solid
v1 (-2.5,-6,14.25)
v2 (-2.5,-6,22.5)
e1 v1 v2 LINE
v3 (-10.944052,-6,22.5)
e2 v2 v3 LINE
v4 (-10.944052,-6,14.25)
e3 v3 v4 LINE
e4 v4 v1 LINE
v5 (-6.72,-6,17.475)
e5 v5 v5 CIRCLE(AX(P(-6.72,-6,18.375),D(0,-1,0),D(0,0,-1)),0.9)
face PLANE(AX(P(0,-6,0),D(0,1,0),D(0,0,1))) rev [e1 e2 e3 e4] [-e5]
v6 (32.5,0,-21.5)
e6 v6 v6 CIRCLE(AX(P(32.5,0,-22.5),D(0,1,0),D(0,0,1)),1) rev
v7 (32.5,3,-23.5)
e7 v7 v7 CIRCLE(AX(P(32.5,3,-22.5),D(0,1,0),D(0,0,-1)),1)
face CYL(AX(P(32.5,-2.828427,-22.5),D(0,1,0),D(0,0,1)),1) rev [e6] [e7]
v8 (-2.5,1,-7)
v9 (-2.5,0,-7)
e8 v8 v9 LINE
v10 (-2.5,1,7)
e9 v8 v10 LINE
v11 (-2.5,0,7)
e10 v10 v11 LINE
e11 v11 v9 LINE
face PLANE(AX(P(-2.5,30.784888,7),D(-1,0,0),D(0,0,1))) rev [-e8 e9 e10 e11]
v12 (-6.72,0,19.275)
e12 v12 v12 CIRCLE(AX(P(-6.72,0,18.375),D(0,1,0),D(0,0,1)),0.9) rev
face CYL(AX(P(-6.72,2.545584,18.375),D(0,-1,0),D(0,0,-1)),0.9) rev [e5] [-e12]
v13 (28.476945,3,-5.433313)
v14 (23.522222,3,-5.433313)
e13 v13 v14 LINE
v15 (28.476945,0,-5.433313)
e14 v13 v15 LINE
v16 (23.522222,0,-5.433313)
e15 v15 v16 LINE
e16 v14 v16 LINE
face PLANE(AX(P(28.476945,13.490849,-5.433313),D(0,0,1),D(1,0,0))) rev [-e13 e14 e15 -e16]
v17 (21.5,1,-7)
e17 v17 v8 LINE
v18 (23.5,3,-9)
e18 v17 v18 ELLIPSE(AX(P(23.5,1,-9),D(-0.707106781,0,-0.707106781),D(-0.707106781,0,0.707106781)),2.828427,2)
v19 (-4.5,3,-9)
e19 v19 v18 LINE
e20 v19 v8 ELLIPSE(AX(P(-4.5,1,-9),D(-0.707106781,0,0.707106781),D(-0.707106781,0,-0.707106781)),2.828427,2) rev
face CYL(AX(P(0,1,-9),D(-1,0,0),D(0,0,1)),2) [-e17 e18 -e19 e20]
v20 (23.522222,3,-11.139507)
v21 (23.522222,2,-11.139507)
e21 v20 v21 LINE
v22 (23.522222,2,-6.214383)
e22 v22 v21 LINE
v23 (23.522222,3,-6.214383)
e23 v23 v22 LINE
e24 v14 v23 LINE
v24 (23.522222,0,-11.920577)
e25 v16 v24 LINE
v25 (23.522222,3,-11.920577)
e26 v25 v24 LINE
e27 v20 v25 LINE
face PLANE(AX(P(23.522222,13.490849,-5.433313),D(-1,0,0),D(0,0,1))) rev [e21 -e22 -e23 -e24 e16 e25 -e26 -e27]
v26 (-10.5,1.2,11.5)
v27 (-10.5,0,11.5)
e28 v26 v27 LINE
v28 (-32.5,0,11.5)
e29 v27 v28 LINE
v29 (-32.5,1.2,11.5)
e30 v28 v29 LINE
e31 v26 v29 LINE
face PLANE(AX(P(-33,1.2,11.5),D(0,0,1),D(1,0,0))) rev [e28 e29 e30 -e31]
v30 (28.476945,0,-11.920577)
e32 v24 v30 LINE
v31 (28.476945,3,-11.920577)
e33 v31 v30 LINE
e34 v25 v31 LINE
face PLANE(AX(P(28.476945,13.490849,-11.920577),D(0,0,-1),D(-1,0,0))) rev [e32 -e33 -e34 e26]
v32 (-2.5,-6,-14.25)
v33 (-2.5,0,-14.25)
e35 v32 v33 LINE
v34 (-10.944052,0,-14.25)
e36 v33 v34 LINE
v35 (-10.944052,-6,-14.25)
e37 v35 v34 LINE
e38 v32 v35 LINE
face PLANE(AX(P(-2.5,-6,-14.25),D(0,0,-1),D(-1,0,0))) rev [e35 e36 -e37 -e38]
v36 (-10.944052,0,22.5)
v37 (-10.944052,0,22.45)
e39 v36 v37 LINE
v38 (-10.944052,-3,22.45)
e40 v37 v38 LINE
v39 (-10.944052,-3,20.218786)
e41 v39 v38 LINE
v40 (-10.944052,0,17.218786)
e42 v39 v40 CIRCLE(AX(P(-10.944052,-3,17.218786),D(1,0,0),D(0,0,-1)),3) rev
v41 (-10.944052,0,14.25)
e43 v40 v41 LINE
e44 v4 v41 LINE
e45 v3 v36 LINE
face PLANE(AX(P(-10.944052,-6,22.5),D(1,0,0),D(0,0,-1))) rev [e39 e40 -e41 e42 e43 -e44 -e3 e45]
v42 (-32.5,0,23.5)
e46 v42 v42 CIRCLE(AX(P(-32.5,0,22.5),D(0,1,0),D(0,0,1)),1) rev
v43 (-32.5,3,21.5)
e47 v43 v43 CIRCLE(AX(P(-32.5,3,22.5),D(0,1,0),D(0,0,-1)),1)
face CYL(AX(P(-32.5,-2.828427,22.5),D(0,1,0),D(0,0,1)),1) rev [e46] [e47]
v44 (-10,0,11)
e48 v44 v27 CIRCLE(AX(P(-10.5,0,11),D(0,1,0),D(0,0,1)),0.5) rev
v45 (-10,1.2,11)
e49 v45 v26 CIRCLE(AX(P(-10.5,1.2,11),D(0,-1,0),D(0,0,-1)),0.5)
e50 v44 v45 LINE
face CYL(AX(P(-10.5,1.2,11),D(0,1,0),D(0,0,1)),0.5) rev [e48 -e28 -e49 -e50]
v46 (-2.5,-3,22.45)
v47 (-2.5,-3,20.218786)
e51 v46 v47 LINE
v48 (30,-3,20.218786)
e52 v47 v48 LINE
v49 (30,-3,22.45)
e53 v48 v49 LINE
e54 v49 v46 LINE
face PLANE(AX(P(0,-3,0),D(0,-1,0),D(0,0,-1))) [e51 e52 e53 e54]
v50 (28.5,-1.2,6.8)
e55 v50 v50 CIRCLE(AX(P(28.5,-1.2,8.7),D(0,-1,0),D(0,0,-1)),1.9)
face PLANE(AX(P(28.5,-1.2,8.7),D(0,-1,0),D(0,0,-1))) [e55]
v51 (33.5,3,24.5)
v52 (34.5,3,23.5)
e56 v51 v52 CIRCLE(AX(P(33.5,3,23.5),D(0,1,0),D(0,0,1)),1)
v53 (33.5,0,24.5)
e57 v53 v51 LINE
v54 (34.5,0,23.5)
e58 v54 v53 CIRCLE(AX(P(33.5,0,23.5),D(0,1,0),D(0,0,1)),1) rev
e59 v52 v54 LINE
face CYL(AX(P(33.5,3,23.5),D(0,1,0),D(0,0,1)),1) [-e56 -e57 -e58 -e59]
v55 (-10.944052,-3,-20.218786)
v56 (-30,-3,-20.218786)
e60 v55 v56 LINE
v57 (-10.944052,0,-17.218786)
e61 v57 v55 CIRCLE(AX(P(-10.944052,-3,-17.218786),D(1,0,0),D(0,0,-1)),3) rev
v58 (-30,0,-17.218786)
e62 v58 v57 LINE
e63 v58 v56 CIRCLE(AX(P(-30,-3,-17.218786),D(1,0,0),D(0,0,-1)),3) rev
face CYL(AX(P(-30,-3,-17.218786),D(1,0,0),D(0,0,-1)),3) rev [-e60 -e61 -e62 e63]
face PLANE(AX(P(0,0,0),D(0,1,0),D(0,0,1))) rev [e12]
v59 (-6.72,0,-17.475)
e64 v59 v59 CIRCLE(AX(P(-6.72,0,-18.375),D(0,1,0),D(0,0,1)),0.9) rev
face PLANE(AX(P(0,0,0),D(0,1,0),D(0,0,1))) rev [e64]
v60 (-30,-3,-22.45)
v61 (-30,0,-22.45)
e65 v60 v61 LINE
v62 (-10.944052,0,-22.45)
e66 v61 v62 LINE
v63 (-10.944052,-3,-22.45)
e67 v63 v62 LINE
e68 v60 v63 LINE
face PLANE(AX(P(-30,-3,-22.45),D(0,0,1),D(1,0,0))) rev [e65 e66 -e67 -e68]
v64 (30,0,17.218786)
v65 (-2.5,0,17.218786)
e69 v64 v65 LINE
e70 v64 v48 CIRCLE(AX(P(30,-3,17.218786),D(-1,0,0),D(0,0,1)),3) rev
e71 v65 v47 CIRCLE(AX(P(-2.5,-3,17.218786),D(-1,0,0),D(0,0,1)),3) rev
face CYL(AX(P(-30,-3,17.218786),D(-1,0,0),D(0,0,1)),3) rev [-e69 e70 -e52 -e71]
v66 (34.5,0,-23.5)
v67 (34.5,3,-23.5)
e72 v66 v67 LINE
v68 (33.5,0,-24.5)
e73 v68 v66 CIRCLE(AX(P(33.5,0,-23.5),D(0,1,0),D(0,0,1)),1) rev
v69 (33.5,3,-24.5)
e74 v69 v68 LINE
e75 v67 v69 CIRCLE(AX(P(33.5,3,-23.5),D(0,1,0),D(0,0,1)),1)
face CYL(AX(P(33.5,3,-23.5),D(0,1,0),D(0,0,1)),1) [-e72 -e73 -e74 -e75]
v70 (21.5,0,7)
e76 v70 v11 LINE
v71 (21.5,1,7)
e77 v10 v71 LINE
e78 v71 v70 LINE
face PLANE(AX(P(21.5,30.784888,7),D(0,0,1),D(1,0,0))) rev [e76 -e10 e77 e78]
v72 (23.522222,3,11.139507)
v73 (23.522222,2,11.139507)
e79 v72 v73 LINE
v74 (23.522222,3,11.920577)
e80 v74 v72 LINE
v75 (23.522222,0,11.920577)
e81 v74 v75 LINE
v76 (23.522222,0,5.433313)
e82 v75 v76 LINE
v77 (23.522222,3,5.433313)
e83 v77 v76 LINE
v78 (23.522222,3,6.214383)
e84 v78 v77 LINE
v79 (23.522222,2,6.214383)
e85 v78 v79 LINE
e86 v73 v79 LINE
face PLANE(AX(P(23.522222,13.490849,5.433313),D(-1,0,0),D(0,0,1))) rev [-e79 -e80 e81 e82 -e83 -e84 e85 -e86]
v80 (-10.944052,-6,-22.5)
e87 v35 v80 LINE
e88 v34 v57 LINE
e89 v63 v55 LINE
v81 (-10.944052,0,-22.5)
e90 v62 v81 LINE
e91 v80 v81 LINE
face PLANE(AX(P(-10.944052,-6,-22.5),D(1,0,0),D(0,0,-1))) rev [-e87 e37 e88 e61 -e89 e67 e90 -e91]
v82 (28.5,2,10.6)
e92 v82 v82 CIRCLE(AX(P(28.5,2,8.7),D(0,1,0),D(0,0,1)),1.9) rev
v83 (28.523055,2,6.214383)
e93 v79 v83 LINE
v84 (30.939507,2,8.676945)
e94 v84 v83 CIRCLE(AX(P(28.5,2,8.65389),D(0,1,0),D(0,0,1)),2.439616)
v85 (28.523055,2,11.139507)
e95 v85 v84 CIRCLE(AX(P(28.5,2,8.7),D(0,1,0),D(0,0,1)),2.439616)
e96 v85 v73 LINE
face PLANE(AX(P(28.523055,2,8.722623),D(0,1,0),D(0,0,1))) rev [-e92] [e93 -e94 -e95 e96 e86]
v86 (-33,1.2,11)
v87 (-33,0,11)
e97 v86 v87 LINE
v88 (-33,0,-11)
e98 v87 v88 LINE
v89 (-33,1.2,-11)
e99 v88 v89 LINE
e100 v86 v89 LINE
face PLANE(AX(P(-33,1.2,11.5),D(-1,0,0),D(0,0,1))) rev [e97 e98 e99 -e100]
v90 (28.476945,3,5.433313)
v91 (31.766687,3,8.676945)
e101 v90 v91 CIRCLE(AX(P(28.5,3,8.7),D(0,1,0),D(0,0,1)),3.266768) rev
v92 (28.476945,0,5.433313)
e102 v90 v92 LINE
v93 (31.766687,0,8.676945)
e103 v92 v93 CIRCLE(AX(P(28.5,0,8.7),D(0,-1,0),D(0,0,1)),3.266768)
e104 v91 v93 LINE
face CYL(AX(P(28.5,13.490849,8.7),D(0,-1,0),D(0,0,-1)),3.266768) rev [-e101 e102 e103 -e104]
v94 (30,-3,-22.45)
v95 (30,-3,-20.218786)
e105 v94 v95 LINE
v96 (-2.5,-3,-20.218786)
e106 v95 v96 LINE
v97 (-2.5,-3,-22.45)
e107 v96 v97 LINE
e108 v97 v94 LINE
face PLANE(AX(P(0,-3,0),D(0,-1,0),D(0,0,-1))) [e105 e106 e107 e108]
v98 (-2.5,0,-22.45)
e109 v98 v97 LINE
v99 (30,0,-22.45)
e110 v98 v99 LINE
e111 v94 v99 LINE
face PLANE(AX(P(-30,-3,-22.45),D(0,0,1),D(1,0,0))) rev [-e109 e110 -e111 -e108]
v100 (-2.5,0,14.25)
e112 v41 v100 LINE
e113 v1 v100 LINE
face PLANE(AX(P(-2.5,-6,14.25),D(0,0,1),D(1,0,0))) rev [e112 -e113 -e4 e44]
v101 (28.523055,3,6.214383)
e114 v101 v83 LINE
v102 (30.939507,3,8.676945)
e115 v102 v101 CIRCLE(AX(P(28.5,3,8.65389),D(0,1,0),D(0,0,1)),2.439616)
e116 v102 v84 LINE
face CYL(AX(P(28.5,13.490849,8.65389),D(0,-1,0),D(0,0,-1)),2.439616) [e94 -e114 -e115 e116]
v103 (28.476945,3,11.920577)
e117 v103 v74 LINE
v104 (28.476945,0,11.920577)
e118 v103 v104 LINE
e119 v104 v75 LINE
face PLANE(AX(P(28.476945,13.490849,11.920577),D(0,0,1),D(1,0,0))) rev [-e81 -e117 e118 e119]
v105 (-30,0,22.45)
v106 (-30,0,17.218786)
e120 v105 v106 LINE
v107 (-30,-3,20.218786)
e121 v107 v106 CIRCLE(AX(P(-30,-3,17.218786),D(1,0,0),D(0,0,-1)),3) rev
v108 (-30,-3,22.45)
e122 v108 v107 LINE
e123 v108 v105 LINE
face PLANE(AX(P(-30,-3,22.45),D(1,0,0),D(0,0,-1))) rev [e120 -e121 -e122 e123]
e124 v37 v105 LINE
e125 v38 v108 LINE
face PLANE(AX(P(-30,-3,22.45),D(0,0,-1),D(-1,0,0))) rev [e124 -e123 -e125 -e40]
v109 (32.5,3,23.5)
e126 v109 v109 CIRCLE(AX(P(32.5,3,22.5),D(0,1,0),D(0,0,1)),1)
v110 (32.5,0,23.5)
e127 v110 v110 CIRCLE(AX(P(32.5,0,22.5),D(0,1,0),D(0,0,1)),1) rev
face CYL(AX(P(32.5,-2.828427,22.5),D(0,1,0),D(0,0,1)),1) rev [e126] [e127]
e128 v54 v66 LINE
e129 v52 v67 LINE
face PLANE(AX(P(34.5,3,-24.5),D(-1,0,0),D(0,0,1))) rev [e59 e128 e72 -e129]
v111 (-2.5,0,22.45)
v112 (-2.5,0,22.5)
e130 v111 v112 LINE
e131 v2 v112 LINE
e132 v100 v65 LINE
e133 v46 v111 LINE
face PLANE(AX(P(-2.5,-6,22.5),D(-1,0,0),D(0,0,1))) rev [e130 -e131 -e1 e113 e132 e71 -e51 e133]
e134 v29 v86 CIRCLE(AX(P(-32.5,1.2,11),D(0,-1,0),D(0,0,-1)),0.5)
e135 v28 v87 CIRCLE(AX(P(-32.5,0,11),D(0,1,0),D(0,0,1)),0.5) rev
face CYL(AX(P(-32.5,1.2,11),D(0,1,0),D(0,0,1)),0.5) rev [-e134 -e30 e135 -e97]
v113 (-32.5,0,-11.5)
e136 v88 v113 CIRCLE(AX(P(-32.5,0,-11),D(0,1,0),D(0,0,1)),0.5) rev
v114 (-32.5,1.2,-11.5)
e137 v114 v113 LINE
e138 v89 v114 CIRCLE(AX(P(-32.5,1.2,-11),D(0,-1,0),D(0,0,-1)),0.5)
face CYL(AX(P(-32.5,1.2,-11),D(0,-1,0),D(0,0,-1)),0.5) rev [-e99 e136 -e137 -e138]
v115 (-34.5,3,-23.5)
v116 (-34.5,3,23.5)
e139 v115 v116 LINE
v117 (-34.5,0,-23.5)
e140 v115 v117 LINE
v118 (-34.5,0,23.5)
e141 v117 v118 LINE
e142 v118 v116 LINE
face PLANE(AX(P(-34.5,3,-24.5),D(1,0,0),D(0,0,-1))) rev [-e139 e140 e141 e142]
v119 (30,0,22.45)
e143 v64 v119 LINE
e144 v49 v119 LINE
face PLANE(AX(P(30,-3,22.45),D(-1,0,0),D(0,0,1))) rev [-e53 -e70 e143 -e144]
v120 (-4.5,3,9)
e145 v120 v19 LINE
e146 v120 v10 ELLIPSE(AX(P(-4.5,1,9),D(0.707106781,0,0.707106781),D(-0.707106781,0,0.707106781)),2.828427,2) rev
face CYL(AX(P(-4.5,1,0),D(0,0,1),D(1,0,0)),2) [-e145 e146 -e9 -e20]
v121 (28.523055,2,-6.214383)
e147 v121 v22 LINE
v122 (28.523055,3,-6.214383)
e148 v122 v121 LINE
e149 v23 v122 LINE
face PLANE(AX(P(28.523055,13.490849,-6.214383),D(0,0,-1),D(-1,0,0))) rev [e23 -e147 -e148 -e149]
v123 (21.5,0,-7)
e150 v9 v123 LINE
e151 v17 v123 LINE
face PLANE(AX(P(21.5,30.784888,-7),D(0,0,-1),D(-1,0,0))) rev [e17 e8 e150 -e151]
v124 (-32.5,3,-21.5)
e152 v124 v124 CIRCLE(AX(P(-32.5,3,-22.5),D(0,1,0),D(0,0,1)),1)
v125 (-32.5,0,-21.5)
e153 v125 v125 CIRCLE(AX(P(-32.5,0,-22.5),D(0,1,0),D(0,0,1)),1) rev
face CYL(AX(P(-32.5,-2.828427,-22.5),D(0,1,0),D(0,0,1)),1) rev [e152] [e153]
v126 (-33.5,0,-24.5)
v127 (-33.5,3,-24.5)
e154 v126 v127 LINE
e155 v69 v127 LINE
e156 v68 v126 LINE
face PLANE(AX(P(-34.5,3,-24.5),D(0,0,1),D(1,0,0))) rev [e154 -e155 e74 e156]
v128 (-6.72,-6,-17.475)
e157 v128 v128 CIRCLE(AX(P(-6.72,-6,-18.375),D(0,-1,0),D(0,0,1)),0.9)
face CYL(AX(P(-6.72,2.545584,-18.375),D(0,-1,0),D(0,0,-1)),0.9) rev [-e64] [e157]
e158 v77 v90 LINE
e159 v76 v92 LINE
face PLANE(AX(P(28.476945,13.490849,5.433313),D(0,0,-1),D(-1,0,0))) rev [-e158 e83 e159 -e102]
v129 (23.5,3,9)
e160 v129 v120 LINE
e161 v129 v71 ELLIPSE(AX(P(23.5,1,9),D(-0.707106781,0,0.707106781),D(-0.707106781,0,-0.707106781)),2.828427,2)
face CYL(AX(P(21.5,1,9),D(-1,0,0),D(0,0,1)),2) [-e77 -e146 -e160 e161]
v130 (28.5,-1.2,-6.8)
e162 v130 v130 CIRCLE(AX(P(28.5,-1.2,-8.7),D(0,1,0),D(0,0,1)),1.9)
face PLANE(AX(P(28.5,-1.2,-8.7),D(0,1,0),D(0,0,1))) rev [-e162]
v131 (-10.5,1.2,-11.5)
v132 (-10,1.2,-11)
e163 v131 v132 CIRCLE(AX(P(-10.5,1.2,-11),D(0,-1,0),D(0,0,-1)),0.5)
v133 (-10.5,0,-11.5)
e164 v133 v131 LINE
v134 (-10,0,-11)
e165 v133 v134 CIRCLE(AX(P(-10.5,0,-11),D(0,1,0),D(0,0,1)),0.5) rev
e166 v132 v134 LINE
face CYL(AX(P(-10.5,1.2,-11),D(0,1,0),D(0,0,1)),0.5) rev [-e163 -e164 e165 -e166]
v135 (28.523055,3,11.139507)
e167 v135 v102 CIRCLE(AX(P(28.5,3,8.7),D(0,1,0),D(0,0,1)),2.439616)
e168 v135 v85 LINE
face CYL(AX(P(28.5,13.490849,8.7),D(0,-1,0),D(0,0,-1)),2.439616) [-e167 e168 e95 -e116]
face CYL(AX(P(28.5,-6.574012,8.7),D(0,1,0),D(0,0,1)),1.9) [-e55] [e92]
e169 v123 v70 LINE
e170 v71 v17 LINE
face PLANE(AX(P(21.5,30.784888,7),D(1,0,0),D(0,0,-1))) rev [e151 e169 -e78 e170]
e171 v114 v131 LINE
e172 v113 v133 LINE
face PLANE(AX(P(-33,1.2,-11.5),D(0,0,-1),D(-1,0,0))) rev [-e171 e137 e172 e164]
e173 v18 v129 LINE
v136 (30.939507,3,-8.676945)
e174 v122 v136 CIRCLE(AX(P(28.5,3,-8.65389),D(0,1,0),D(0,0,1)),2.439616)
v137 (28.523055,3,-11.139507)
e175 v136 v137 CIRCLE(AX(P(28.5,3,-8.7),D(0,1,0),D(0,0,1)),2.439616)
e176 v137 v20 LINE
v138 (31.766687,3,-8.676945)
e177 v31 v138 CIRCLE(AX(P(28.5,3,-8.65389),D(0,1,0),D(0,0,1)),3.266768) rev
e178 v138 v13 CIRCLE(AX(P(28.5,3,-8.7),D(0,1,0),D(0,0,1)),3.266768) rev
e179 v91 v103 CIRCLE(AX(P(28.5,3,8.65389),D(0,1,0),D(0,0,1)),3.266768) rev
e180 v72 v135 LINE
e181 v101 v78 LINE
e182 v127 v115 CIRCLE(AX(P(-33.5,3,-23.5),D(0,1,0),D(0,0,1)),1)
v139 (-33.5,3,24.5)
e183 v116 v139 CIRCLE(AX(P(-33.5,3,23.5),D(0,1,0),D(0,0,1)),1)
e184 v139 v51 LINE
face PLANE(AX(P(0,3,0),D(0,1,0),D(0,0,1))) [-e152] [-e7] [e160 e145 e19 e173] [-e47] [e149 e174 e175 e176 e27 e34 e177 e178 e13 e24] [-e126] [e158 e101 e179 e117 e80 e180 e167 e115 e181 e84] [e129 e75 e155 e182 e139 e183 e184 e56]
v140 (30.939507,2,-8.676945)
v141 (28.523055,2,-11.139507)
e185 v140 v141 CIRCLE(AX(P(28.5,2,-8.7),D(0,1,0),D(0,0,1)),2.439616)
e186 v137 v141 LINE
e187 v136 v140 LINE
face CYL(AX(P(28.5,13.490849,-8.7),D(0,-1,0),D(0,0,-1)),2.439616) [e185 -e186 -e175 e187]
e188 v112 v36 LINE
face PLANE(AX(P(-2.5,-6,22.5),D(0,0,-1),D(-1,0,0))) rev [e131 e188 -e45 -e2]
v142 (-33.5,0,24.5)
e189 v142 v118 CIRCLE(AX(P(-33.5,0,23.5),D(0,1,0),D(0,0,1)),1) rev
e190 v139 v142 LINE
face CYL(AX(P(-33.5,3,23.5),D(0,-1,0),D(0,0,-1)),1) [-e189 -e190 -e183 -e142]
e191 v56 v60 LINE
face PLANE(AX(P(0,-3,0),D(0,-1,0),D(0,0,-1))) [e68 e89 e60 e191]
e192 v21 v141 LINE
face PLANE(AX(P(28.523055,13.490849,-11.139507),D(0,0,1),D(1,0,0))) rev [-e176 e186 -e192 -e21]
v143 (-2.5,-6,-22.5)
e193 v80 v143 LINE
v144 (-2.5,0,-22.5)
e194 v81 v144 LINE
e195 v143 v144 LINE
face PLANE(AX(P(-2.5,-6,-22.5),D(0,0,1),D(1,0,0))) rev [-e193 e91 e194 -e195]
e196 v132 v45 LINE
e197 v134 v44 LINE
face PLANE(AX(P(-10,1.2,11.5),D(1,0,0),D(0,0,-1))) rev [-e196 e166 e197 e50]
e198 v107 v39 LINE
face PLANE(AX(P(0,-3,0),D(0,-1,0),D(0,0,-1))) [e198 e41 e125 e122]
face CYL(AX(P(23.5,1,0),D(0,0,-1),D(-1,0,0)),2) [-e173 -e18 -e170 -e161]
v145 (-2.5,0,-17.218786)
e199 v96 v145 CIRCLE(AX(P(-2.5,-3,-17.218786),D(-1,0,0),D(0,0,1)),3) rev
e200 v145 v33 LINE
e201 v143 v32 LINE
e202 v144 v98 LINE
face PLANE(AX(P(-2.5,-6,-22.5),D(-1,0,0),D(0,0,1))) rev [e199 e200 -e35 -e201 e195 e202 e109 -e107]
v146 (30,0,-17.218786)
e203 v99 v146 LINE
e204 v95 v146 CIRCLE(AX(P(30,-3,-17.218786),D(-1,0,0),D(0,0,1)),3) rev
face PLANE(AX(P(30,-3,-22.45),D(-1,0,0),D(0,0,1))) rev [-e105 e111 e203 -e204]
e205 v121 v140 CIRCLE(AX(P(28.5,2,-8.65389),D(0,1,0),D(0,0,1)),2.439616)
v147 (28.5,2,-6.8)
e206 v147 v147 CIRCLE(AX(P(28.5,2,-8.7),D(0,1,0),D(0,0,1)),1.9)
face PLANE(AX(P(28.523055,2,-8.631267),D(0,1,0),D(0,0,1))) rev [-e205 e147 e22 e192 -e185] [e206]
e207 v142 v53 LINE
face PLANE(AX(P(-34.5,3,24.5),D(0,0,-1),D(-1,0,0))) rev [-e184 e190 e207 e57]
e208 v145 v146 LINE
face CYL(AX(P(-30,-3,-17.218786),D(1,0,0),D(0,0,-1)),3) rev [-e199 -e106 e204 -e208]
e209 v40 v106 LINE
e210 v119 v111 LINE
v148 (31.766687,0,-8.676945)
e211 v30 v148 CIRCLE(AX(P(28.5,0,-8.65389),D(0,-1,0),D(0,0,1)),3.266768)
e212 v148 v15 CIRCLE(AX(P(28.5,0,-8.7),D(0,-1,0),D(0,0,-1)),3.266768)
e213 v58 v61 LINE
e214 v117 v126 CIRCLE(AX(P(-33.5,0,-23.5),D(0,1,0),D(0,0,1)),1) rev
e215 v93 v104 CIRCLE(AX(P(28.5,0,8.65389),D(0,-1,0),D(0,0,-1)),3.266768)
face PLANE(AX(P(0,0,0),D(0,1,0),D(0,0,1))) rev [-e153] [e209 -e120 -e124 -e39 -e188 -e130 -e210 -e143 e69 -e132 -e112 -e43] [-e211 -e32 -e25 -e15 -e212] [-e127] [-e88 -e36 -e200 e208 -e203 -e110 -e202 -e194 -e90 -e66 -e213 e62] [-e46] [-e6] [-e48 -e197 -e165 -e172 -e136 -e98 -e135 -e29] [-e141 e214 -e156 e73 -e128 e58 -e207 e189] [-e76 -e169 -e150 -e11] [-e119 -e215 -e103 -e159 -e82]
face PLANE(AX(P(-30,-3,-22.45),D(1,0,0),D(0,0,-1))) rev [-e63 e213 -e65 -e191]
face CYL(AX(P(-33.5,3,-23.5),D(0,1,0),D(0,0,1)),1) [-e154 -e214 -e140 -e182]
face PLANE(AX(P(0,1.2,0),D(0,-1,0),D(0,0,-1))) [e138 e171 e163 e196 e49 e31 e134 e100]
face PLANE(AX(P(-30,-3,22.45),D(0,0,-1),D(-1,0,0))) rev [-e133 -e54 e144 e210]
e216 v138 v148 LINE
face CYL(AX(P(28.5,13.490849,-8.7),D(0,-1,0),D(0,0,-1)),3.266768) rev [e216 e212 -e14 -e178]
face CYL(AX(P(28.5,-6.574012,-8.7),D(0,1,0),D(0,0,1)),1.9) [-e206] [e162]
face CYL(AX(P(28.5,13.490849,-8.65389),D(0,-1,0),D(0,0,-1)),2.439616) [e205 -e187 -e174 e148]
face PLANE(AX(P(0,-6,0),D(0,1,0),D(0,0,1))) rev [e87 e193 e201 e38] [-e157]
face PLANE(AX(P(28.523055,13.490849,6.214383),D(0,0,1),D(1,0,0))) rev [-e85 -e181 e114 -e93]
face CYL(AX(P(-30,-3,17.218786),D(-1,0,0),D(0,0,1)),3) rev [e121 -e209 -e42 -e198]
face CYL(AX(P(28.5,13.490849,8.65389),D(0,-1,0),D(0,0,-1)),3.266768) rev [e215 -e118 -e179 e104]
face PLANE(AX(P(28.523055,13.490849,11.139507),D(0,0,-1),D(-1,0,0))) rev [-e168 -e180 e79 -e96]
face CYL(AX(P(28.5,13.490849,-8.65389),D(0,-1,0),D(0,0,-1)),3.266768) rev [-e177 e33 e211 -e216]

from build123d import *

# Parameters (mm, degrees)
SCHIZZO1_W                        = 69
SCHIZZO1_H                        = 49
ESTRUSIONE_ESTRUSIONE1_DEPTH      = 3
RACCORDO1_R                       = 1
RACCORDO2_R                       = 1
RACCORDO3_R                       = 1
RACCORDO4_R                       = 1
SCHIZZO2_W                        = 60
SCHIZZO2_H                        = 2.231214474
ESTRUSIONE_ESTRUSIONE2_DEPTH      = 3
RACCORDO5_R                       = 3
RACCORDO6_R                       = 3
SCHIZZO3_R                        = 1
TAGLIO_ESTRUSIONE1_DEPTH          = 3
SCHIZZO4_W                        = 24
SCHIZZO4_H                        = 14
TAGLIO_ESTRUSIONE2_DEPTH          = 3
SCHIZZO5_W                        = 23
SCHIZZO5_H                        = 23
TAGLIO_ESTRUSIONE3_DEPTH          = 1.2
RACCORDO7_R                       = 0.5
RACCORDO8_R                       = 0.5
RACCORDO9_R                       = 0.5
RACCORDO10_R                      = 0.5
RACCORDO11_R                      = 2
RACCORDO12_R                      = 2
RACCORDO13_R                      = 2
RACCORDO14_R                      = 2
SCHIZZO6_W                        = 8.444052449
SCHIZZO6_H                        = 8.25
ESTRUSIONE_ESTRUSIONE3_DEPTH      = 6
SCHIZZO7_R                        = 0.9
TAGLIO_ESTRUSIONE4_DEPTH          = 6
ESTRUSIONE_ESTRUSIONE4_DEPTH      = 1.2
ESTRUSIONE_ESTRUSIONE4_DEPTH_BACK = 3
SCHIZZO8_R                        = 1.75
TAGLIO_ESTRUSIONE5_DEPTH          = 3
TAGLIO_ESTRUSIONE6_DEPTH          = 2
SCHIZZO13_R                       = 1.9
ESTRUSIONE_ESTRUSIONE5_DEPTH      = 3.2
SCHIZZO14_R                       = 1.9
ESTRUSIONE_ESTRUSIONE6_DEPTH      = 3.2


with BuildPart() as part:
    # Schizzo1 → Estrusione-Estrusione1 (new body)
    with BuildSketch(Plane(origin=(0, 0, 0), x_dir=(1, 0, 0), z_dir=(0, 1, 0))):
        Rectangle(SCHIZZO1_W, SCHIZZO1_H)
    extrude(amount=ESTRUSIONE_ESTRUSIONE1_DEPTH)

    # Raccordo1
    raccordo1_edges = [part.edges().sort_by_distance(p)[0] for p in [
        (-34.5, 1.5, 24.5),
    ]]
    fillet(raccordo1_edges, radius=RACCORDO1_R)

    # Raccordo2
    raccordo2_edges = [part.edges().sort_by_distance(p)[0] for p in [
        (-34.5, 1.5, -24.5),
    ]]
    fillet(raccordo2_edges, radius=RACCORDO2_R)

    # Raccordo3
    raccordo3_edges = [part.edges().sort_by_distance(p)[0] for p in [
        (34.5, 1.5, 24.5),
    ]]
    fillet(raccordo3_edges, radius=RACCORDO3_R)

    # Raccordo4
    raccordo4_edges = [part.edges().sort_by_distance(p)[0] for p in [
        (34.5, 1.5, -24.5),
    ]]
    fillet(raccordo4_edges, radius=RACCORDO4_R)

    # Schizzo2 → Estrusione-Estrusione2 (add)
    with BuildSketch(Plane.XZ):
        with Locations((0, 21.334392763)):
            Rectangle(SCHIZZO2_W, SCHIZZO2_H)
        with Locations((0, -21.334392763)):
            Rectangle(SCHIZZO2_W, SCHIZZO2_H)
    extrude(amount=ESTRUSIONE_ESTRUSIONE2_DEPTH)

    # Raccordo5
    raccordo5_edges = [part.edges().sort_by_distance(p)[0] for p in [
        (0, 0, 20.218785526),
    ]]
    fillet(raccordo5_edges, radius=RACCORDO5_R - 0.0001)  # a hair under: the kernel refuses the full size

    # Raccordo6
    raccordo6_edges = [part.edges().sort_by_distance(p)[0] for p in [
        (0, 0, -20.218785526),
    ]]
    fillet(raccordo6_edges, radius=RACCORDO6_R - 0.0001)  # a hair under: the kernel refuses the full size

    # Schizzo3 → Taglio-Estrusione1 (cut)
    with BuildSketch(Plane(origin=(0, 3, 0), x_dir=(1, 0, 0), z_dir=(0, 1, 0))):
        with Locations(Location((-32.5, 22.5, 0), (0, 0, 270))):
            Circle(SCHIZZO3_R)
        with Locations(Location((32.5, 22.5, 0), (0, 0, 270))):
            Circle(SCHIZZO3_R)
        with Locations(Location((32.5, -22.5, 0), (0, 0, 270))):
            Circle(SCHIZZO3_R)
        with Locations(Location((-32.5, -22.5, 0), (0, 0, 270))):
            Circle(SCHIZZO3_R)
    extrude(amount=-TAGLIO_ESTRUSIONE1_DEPTH, mode=Mode.SUBTRACT)

    # Schizzo4 → Taglio-Estrusione2 (cut)
    with BuildSketch(Plane.XZ):
        with Locations((9.5, 0)):
            Rectangle(SCHIZZO4_W, SCHIZZO4_H)
    extrude(amount=-TAGLIO_ESTRUSIONE2_DEPTH, mode=Mode.SUBTRACT)

    # Schizzo5 → Taglio-Estrusione3 (cut)
    with BuildSketch(Plane.XZ):
        with Locations((-21.5, 0)):
            Rectangle(SCHIZZO5_W, SCHIZZO5_H)
    extrude(amount=-TAGLIO_ESTRUSIONE3_DEPTH, mode=Mode.SUBTRACT)

    # Raccordo7
    raccordo7_edges = [part.edges().sort_by_distance(p)[0] for p in [
        (-33, 0.6, 11.5),
    ]]
    fillet(raccordo7_edges, radius=RACCORDO7_R)

    # Raccordo8
    raccordo8_edges = [part.edges().sort_by_distance(p)[0] for p in [
        (-10, 0.6, 11.5),
    ]]
    fillet(raccordo8_edges, radius=RACCORDO8_R)

    # Raccordo9
    raccordo9_edges = [part.edges().sort_by_distance(p)[0] for p in [
        (-33, 0.6, -11.5),
    ]]
    fillet(raccordo9_edges, radius=RACCORDO9_R)

    # Raccordo10
    raccordo10_edges = [part.edges().sort_by_distance(p)[0] for p in [
        (-10, 0.6, -11.5),
    ]]
    fillet(raccordo10_edges, radius=RACCORDO10_R)

    # Raccordo11
    raccordo11_edges = [part.edges().sort_by_distance(p)[0] for p in [
        (21.5, 3, 0),
    ]]
    fillet(raccordo11_edges, radius=RACCORDO11_R)

    # Raccordo12
    raccordo12_edges = [part.edges().sort_by_distance(p)[0] for p in [
        (10.5, 3, 7),
    ]]
    fillet(raccordo12_edges, radius=RACCORDO12_R)

    # Raccordo13
    raccordo13_edges = [part.edges().sort_by_distance(p)[0] for p in [
        (-2.5, 3, 1),
    ]]
    fillet(raccordo13_edges, radius=RACCORDO13_R)

    # Raccordo14
    raccordo14_edges = [part.edges().sort_by_distance(p)[0] for p in [
        (9.5, 3, -7),
    ]]
    fillet(raccordo14_edges, radius=RACCORDO14_R)

    # Schizzo6 → Estrusione-Estrusione3 (add)
    with BuildSketch(Plane.XZ):
        with Locations((-6.722026225, 18.375)):
            Rectangle(SCHIZZO6_W, SCHIZZO6_H)
        with Locations((-6.722026225, -18.375)):
            Rectangle(SCHIZZO6_W, SCHIZZO6_H)
    extrude(amount=ESTRUSIONE_ESTRUSIONE3_DEPTH)

    # Schizzo7 → Taglio-Estrusione4 (cut)
    with BuildSketch(Plane.XZ.offset(6)):
        with Locations(Location((-6.72, 18.375, 0), (0, 0, 270))):
            Circle(SCHIZZO7_R)
        with Locations(Location((-6.72, -18.375, 0), (0, 0, 90))):
            Circle(SCHIZZO7_R)
    extrude(amount=-TAGLIO_ESTRUSIONE4_DEPTH, mode=Mode.SUBTRACT)

    # Schizzo8 → Estrusione-Estrusione4 (add, two sides: drawn at the far end of the back side and taken through both)
    with BuildSketch(Plane.XZ.offset(-ESTRUSIONE_ESTRUSIONE4_DEPTH_BACK)):
        with Locations(Location((28.5, 8.7, 0), (0, 0, 270))):
            Circle(SCHIZZO8_R)
        with Locations(Location((28.5, -8.7, 0), (0, 0, 90))):
            Circle(SCHIZZO8_R)
    extrude(amount=ESTRUSIONE_ESTRUSIONE4_DEPTH + ESTRUSIONE_ESTRUSIONE4_DEPTH_BACK)

    # Schizzo9 → Taglio-Estrusione5 (cut)
    with BuildSketch(Plane.XZ):
        with BuildLine():
            Line((28.523054823, 11.139507375), (23.522221501, 11.139507375))
            Line((23.522221501, 11.139507375), (23.522221501, 11.920576973))
            Line((23.522221501, 11.920576973), (28.476945177, 11.920576973))
            ThreePointArc((28.476945177, 11.920576973), (30.793594038, 10.980088836), (31.766686618, 8.676945177))
            ThreePointArc((31.766686618, 8.676945177), (30.793594038, 6.373801519), (28.476945177, 5.433313382))
            Line((28.476945177, 5.433313382), (23.522221501, 5.433313382))
            Line((23.522221501, 5.433313382), (23.522221501, 6.21438298))
            Line((23.522221501, 6.21438298), (28.523054823, 6.21438298))
            ThreePointArc((28.523054823, 6.21438298), (30.241294429, 6.945200369), (30.939507375, 8.676945177))
            ThreePointArc((30.939507375, 8.676945177), (30.241294429, 10.408689986), (28.523054823, 11.139507375))
        make_face()
        with BuildLine():
            Line((23.522221501, -5.433313382), (23.522221501, -6.21438298))
            Line((23.522221501, -6.21438298), (28.523054823, -6.21438298))
            ThreePointArc((28.523054823, -6.21438298), (30.241294429, -6.945200369), (30.939507375, -8.676945177))
            ThreePointArc((30.939507375, -8.676945177), (30.241294429, -10.408689986), (28.523054823, -11.139507375))
            Line((28.523054823, -11.139507375), (23.522221501, -11.139507375))
            Line((23.522221501, -11.139507375), (23.522221501, -11.920576973))
            Line((23.522221501, -11.920576973), (28.476945177, -11.920576973))
            ThreePointArc((28.476945177, -11.920576973), (30.793594038, -10.980088836), (31.766686618, -8.676945177))
            ThreePointArc((31.766686618, -8.676945177), (30.793594038, -6.373801519), (28.476945177, -5.433313382))
            Line((28.476945177, -5.433313382), (23.522221501, -5.433313382))
        make_face()
    extrude(amount=-TAGLIO_ESTRUSIONE5_DEPTH, mode=Mode.SUBTRACT)

    # Schizzo11 → Taglio-Estrusione6 (cut)
    with BuildSketch(Plane.XZ):
        with BuildLine():
            Line((28.523054823, 11.139507375), (23.522221501, 11.139507375))
            Line((23.522221501, 11.139507375), (23.522221501, 6.21438298))
            Line((23.522221501, 6.21438298), (28.523054823, 6.21438298))
            ThreePointArc((28.523054823, 6.21438298), (30.248124061, 6.938498616), (30.939507375, 8.676945177))
            ThreePointArc((30.939507375, 8.676945177), (30.248124061, 10.415391738), (28.523054823, 11.139507375))
        make_face()
        with BuildLine():
            Line((23.522221501, -6.21438298), (28.523054823, -6.21438298))
            ThreePointArc((28.523054823, -6.21438298), (30.248124061, -6.938498616), (30.939507375, -8.676945177))
            ThreePointArc((30.939507375, -8.676945177), (30.248124061, -10.415391738), (28.523054823, -11.139507375))
            Line((28.523054823, -11.139507375), (23.522221501, -11.139507375))
            Line((23.522221501, -11.139507375), (23.522221501, -6.21438298))
        make_face()
    extrude(amount=-TAGLIO_ESTRUSIONE6_DEPTH, mode=Mode.SUBTRACT)


with BuildPart() as taglio_estrusione6_piece_1:
    # of the separate pieces the step leaves, piece 1, a body of its own (taglio_estrusione6_pieces)
    add(part.part.solids().sort_by_distance((34.5, 3, -23.5))[0])



with BuildPart() as taglio_estrusione6_piece_2:
    # of the separate pieces the step leaves, piece 2, a body of its own (taglio_estrusione6_pieces)
    add(part.part.solids().sort_by_distance((28.5, 0, 6.95))[0])


with BuildPart() as taglio_estrusione6_piece_3:
    # of the separate pieces the step leaves, piece 3, a body of its own (taglio_estrusione6_pieces)
    add(part.part.solids().sort_by_distance((28.5, 0, -6.95))[0])


with BuildPart() as taglio_estrusione6_piece_1_1:
    add(taglio_estrusione6_piece_1.part)

    add(taglio_estrusione6_piece_2.part)  # Estrusione-Estrusione5 merges Taglio-Estrusione6 piece 2
    # Schizzo13 → Estrusione-Estrusione5 (add)
    with BuildSketch(Plane.XZ.offset(-2)):
        with Locations(Location((28.5, 8.7, 0), (0, 0, 90))):
            Circle(SCHIZZO13_R)
    extrude(amount=ESTRUSIONE_ESTRUSIONE5_DEPTH)


    add(taglio_estrusione6_piece_3.part)  # Estrusione-Estrusione6 merges Taglio-Estrusione6 piece 3
    # Schizzo14 → Estrusione-Estrusione6 (add)
    with BuildSketch(Plane.XZ.offset(-2)):
        with Locations(Location((28.5, -8.7, 0), (0, 0, 90))):
            Circle(SCHIZZO14_R)
    extrude(amount=ESTRUSIONE_ESTRUSIONE6_DEPTH)


solid = taglio_estrusione6_piece_1_1.part
